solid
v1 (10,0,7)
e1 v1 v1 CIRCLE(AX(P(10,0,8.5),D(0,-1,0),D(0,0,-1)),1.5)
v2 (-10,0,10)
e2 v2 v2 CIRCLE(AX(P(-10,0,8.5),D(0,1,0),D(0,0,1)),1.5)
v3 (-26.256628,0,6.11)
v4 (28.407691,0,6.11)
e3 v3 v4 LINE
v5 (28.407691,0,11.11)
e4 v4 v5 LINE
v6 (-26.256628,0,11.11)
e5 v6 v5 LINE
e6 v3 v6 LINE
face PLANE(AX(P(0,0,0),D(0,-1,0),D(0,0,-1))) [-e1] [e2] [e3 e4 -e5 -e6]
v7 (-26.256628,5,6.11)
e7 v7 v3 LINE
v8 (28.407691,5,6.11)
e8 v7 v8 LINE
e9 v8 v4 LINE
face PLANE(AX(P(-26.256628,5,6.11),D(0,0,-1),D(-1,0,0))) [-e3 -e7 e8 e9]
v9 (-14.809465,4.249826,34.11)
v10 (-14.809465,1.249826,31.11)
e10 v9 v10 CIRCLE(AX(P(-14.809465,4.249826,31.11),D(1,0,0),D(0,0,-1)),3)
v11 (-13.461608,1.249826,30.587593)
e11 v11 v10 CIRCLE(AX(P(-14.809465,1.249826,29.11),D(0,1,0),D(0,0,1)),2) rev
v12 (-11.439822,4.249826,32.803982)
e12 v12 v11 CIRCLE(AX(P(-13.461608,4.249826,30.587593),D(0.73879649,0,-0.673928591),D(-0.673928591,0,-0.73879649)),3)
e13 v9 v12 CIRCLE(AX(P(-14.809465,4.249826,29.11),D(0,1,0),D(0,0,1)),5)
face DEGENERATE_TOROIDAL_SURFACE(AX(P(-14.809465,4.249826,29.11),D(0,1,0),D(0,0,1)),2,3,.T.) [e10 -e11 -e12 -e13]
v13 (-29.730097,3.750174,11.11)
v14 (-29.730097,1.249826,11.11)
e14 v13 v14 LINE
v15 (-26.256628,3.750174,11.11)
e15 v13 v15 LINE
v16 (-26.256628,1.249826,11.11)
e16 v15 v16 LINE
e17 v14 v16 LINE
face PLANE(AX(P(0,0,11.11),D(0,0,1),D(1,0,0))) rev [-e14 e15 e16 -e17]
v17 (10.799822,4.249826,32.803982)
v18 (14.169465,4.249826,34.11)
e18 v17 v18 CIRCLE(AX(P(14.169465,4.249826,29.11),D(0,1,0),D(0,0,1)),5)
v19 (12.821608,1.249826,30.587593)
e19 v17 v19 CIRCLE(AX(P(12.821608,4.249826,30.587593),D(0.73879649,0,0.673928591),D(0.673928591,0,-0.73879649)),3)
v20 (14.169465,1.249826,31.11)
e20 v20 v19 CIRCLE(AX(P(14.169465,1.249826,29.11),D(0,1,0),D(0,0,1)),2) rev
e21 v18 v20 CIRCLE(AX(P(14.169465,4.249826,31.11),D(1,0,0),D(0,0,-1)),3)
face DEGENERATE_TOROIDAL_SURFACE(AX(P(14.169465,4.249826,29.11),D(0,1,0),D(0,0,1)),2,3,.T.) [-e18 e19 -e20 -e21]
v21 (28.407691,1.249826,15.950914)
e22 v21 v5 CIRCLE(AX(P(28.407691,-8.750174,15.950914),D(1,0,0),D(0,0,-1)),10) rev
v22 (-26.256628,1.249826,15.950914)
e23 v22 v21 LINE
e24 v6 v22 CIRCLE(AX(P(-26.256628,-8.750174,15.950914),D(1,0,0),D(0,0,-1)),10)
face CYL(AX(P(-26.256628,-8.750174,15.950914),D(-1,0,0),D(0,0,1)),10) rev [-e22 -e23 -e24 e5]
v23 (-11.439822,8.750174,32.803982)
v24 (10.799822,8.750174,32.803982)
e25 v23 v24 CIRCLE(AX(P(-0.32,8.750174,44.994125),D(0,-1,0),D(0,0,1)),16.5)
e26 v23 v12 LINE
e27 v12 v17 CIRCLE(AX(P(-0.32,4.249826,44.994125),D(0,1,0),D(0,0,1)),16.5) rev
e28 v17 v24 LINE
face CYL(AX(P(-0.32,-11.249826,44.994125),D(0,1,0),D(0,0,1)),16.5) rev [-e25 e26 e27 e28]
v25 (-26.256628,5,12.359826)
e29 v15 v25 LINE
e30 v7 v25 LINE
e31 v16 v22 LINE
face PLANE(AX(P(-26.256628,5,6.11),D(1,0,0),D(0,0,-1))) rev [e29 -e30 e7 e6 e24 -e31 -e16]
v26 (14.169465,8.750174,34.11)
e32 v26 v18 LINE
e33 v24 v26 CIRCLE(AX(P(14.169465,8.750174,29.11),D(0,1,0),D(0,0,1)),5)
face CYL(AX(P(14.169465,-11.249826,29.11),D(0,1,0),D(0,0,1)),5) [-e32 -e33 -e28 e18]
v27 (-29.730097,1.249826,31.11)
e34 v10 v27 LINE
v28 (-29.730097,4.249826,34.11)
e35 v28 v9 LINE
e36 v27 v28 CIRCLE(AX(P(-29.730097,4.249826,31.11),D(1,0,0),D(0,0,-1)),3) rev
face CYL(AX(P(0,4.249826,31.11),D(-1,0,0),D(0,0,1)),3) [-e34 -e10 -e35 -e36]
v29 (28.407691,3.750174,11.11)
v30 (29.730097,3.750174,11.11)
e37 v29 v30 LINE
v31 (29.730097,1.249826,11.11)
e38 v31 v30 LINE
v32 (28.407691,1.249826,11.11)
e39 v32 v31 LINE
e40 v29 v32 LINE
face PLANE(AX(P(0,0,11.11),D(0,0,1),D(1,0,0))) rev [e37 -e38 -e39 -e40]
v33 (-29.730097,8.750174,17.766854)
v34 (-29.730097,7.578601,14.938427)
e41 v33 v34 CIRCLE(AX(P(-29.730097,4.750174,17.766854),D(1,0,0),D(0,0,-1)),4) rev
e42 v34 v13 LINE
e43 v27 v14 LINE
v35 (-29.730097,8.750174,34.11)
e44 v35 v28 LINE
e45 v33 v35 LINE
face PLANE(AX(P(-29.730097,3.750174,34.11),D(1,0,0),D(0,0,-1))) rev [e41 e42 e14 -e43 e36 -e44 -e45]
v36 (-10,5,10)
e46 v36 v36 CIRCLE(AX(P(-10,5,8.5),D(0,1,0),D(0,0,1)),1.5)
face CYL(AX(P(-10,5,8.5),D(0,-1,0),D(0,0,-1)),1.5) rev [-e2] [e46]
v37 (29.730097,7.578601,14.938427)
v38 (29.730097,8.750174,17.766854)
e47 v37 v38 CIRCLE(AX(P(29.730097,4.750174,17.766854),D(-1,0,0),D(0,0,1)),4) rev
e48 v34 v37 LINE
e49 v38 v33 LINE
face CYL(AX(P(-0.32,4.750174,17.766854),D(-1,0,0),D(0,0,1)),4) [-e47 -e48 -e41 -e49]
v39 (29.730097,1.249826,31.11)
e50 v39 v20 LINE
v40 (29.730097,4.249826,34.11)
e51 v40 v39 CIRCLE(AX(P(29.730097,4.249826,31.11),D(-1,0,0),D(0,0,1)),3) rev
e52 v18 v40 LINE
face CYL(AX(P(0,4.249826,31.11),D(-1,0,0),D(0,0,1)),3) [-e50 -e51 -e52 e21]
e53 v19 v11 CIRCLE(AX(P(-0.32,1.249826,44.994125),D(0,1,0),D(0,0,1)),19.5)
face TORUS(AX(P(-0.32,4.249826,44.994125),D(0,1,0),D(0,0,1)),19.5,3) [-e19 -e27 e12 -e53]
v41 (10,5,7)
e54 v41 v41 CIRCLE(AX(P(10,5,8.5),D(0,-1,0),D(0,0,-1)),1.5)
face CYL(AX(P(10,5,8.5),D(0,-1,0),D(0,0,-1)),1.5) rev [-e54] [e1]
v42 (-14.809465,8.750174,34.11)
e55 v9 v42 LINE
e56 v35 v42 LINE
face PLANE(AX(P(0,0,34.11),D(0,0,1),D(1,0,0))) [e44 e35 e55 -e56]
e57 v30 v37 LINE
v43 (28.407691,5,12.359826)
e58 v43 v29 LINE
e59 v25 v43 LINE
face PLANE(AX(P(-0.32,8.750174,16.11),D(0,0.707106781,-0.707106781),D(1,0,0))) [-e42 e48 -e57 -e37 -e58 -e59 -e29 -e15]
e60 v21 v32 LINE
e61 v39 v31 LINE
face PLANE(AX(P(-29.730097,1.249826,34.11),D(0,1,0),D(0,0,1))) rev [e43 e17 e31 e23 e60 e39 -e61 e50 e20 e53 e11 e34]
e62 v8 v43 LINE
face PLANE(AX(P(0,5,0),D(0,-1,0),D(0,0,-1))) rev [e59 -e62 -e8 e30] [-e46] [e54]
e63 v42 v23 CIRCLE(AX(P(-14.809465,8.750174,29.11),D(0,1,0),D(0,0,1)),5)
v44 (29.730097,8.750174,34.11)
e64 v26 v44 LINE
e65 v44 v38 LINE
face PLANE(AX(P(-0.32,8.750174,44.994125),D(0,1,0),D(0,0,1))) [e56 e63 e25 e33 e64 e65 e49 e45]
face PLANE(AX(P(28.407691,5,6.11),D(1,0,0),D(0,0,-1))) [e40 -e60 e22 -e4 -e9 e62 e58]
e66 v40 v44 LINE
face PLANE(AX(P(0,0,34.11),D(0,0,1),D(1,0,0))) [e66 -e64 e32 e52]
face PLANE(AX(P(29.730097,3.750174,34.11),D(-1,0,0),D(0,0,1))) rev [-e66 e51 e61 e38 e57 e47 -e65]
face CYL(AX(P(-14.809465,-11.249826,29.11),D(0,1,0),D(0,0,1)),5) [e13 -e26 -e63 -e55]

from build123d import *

# Parameters (mm, degrees)
SKETCH_1_W          = 54.664318292
SKETCH_1_H          = 5
SKETCH_1_R          = 1.5
EXTRUDE_1_DEPTH     = 5
SKETCH_2_W          = 59.460193076
SKETCH_2_H          = 2.500348526
EXTRUDE_2_DEPTH     = 23
SKETCH_5_R          = 16.5
CUT_EXTRUDE_1_DEPTH = 15
EXTRUDE_START       = 5
EXTRUDE_3_DEPTH     = 5
CHAMFER_1_SIZE      = 5
FILLET_6_R          = 10
FILLET_7_R          = 4
FILLET_8_R          = 5
FILLET_9_R          = 3


with BuildPart() as part:
    # 草图1 → 凸台-拉伸1 (new body)
    with BuildSketch(Plane(origin=(0, 0, 0), x_dir=(1, 0, 0), z_dir=(0, 1, 0))):
        with Locations((1.075531559, -8.61)):
            Rectangle(SKETCH_1_W, SKETCH_1_H)
        with Locations(Location((-10, -8.5, 0), (0, 0, 270))):
            Circle(SKETCH_1_R, mode=Mode.SUBTRACT)
        with Locations(Location((10, -8.5, 0), (0, 0, 90))):
            Circle(SKETCH_1_R, mode=Mode.SUBTRACT)
    extrude(amount=EXTRUDE_1_DEPTH)

    # 草图2 → 凸台-拉伸2 (add)
    with BuildSketch(Plane.XY.offset(11.11)):
        with Locations((0, 2.5)):
            Rectangle(SKETCH_2_W, SKETCH_2_H)
    extrude(amount=EXTRUDE_2_DEPTH)

    # 草图5 → 切除-拉伸1 (cut)
    with BuildSketch(Plane(origin=(0, 3.750174263, 0), x_dir=(1, 0, 0), z_dir=(0, 1, 0))):
        with Locations((-0.32, -44.994124541)):
            Circle(SKETCH_5_R)
    extrude(amount=-CUT_EXTRUDE_1_DEPTH, mode=Mode.SUBTRACT)

    # 草图7 → 凸台-拉伸3 (add)
    with BuildSketch(Plane(origin=(0, 3.750174263, 0), x_dir=(1, 0, 0), z_dir=(0, 1, 0)).offset(EXTRUDE_START)):
        with BuildLine():
            Line((29.730096538, -11.11), (28.407690705, -11.11))
            Line((28.407690705, -11.11), (-26.256627587, -11.11))
            Line((-26.256627587, -11.11), (-29.730096538, -11.11))
            Line((-29.730096538, -11.11), (-29.730096538, -34.11))
            Line((-29.730096538, -34.11), (-12.721041608, -34.11))
            ThreePointArc((-12.721041608, -34.11), (-0.32, -28.494124541), (12.081041608, -34.11))
            Line((12.081041608, -34.11), (29.730096538, -34.11))
            Line((29.730096538, -34.11), (29.730096538, -11.11))
        make_face()
    extrude(amount=-EXTRUDE_3_DEPTH)

    # 倒角1
    # the kernel refuses this chamfer: 5 mm, written as the material it takes off along each edge
    with BuildSketch(Plane(origin=(-42.588511478, 8.750174263, 11.11), x_dir=(0, -0.9996219169112968, -0.027495876610586317), z_dir=(1, 0, 0))) as chamfer_1_piece_1_section:
        Polygon((CHAMFER_1_SIZE * 0.999621916911, -CHAMFER_1_SIZE * 0.0274958766106), (-CHAMFER_1_SIZE * 0.0274958766106, -CHAMFER_1_SIZE * 0.999621916911), (0, 0), align=None)
    chamfer_1_piece_1 = extrude(amount=85.177022955, mode=Mode.PRIVATE)
    chamfer_1_piece_1 = split(chamfer_1_piece_1, bisect_by=Plane(origin=(-34.422569532, 5, 11.399404242), z_dir=(0, -1, 0)), keep=Keep.TOP, mode=Mode.PRIVATE)
    chamfer_1_piece_1 = split(chamfer_1_piece_1, bisect_by=Plane(origin=(-26.256627587, 4.506210637, 11.399404242), z_dir=(-1, 0, 0)), keep=Keep.TOP, mode=Mode.PRIVATE)
    add(chamfer_1_piece_1, mode=Mode.SUBTRACT)
    with BuildSketch(Plane(origin=(-42.588511478, 8.750174263, 11.11), x_dir=(0, -0.9996219169112968, -0.027495876610586317), z_dir=(1, 0, 0))) as chamfer_1_piece_2_section:
        Polygon((CHAMFER_1_SIZE * 0.999621916911, -CHAMFER_1_SIZE * 0.0274958766106), (-CHAMFER_1_SIZE * 0.0274958766106, -CHAMFER_1_SIZE * 0.999621916911), (0, 0), align=None)
    chamfer_1_piece_2 = extrude(amount=85.177022955, mode=Mode.PRIVATE)
    chamfer_1_piece_2 = split(chamfer_1_piece_2, bisect_by=Plane(origin=(-34.422569532, 5, 12.869772417), z_dir=(0, 1, 0)), keep=Keep.TOP, mode=Mode.PRIVATE)
    chamfer_1_piece_2 = split(chamfer_1_piece_2, bisect_by=Plane(origin=(-26.256627587, 7.312697929, 12.869772417), z_dir=(-1, 0, 0)), keep=Keep.TOP, mode=Mode.PRIVATE)
    add(chamfer_1_piece_2, mode=Mode.SUBTRACT)
    with BuildSketch(Plane(origin=(-42.588511478, 8.750174263, 11.11), x_dir=(0, -0.9996219169112968, -0.027495876610586317), z_dir=(1, 0, 0))) as chamfer_1_piece_3_section:
        Polygon((CHAMFER_1_SIZE * 0.999621916911, -CHAMFER_1_SIZE * 0.0274958766106), (-CHAMFER_1_SIZE * 0.0274958766106, -CHAMFER_1_SIZE * 0.999621916911), (0, 0), align=None)
    chamfer_1_piece_3 = extrude(amount=85.177022955, mode=Mode.PRIVATE)
    chamfer_1_piece_3 = split(chamfer_1_piece_3, bisect_by=Plane(origin=(1.075531559, 5, 12.869772417), z_dir=(0, 1, 0)), keep=Keep.TOP, mode=Mode.PRIVATE)
    chamfer_1_piece_3 = split(chamfer_1_piece_3, bisect_by=Plane(origin=(28.407690705, 7.312697929, 12.869772417), z_dir=(-1, 0, 0)), keep=Keep.TOP, mode=Mode.PRIVATE)
    chamfer_1_piece_3 = split(chamfer_1_piece_3, bisect_by=Plane(origin=(-26.256627587, 7.312697929, 12.869772417), z_dir=(1, 0, 0)), keep=Keep.TOP, mode=Mode.PRIVATE)
    add(chamfer_1_piece_3, mode=Mode.SUBTRACT)
    with BuildSketch(Plane(origin=(-42.588511478, 8.750174263, 11.11), x_dir=(0, -0.9996219169112968, -0.027495876610586317), z_dir=(1, 0, 0))) as chamfer_1_piece_4_section:
        Polygon((CHAMFER_1_SIZE * 0.999621916911, -CHAMFER_1_SIZE * 0.0274958766106), (-CHAMFER_1_SIZE * 0.0274958766106, -CHAMFER_1_SIZE * 0.999621916911), (0, 0), align=None)
    chamfer_1_piece_4 = extrude(amount=85.177022955, mode=Mode.PRIVATE)
    chamfer_1_piece_4 = split(chamfer_1_piece_4, bisect_by=Plane(origin=(35.498101091, 5, 11.399404242), z_dir=(0, -1, 0)), keep=Keep.TOP, mode=Mode.PRIVATE)
    chamfer_1_piece_4 = split(chamfer_1_piece_4, bisect_by=Plane(origin=(28.407690705, 4.506210637, 11.399404242), z_dir=(1, 0, 0)), keep=Keep.TOP, mode=Mode.PRIVATE)
    add(chamfer_1_piece_4, mode=Mode.SUBTRACT)
    with BuildSketch(Plane(origin=(-42.588511478, 8.750174263, 11.11), x_dir=(0, -0.9996219169112968, -0.027495876610586317), z_dir=(1, 0, 0))) as chamfer_1_piece_5_section:
        Polygon((CHAMFER_1_SIZE * 0.999621916911, -CHAMFER_1_SIZE * 0.0274958766106), (-CHAMFER_1_SIZE * 0.0274958766106, -CHAMFER_1_SIZE * 0.999621916911), (0, 0), align=None)
    chamfer_1_piece_5 = extrude(amount=85.177022955, mode=Mode.PRIVATE)
    chamfer_1_piece_5 = split(chamfer_1_piece_5, bisect_by=Plane(origin=(35.498101091, 5, 12.869772417), z_dir=(0, 1, 0)), keep=Keep.TOP, mode=Mode.PRIVATE)
    chamfer_1_piece_5 = split(chamfer_1_piece_5, bisect_by=Plane(origin=(28.407690705, 7.312697929, 12.869772417), z_dir=(1, 0, 0)), keep=Keep.TOP, mode=Mode.PRIVATE)
    add(chamfer_1_piece_5, mode=Mode.SUBTRACT)

    # 圆角6
    # the kernel refuses this fillet: 10 mm, written as the material it adds along each edge
    with BuildSketch(Plane(origin=(28.407690705, 1.249825737, 11.11), x_dir=(0, 0, 1), z_dir=(-1, 0, 0))) as fillet_6_piece_1:
        with BuildLine():
            CenterArc((4.840914208, -10), FILLET_6_R, 90, 28.952961909)
            Line((0, -1.249825737), (0, 0))
            Line((0, 0), (4.840914208, 0))
        make_face()
    extrude(amount=54.664318292)

    # 圆角7
    fillet_7_edges = [part.edges().sort_by_distance(p)[0] for p in [
        (0, 8.750174263, 16.11),
    ]]
    fillet(fillet_7_edges, radius=FILLET_7_R)

    # 圆角8
    fillet_8_edges = [part.edges().sort_by_distance(p)[0] for p in [
        (-12.721041608, 5, 34.11),
        (12.081041608, 5, 34.11),
    ]]
    fillet(fillet_8_edges, radius=FILLET_8_R)

    # 圆角9
    fillet_9_edges = [part.edges().sort_by_distance(p)[0] for p in [
        (-0.32, 1.249825737, 28.494124541),
        (21.949780623, 1.249825737, 34.11),
        (12.362521469, 1.249825737, 33.772076375),
        (-13.002521469, 1.249825737, 33.772076375),
        (-22.269780623, 1.249825737, 34.11),
    ]]
    fillet(fillet_9_edges, radius=FILLET_9_R)


solid = part.part
